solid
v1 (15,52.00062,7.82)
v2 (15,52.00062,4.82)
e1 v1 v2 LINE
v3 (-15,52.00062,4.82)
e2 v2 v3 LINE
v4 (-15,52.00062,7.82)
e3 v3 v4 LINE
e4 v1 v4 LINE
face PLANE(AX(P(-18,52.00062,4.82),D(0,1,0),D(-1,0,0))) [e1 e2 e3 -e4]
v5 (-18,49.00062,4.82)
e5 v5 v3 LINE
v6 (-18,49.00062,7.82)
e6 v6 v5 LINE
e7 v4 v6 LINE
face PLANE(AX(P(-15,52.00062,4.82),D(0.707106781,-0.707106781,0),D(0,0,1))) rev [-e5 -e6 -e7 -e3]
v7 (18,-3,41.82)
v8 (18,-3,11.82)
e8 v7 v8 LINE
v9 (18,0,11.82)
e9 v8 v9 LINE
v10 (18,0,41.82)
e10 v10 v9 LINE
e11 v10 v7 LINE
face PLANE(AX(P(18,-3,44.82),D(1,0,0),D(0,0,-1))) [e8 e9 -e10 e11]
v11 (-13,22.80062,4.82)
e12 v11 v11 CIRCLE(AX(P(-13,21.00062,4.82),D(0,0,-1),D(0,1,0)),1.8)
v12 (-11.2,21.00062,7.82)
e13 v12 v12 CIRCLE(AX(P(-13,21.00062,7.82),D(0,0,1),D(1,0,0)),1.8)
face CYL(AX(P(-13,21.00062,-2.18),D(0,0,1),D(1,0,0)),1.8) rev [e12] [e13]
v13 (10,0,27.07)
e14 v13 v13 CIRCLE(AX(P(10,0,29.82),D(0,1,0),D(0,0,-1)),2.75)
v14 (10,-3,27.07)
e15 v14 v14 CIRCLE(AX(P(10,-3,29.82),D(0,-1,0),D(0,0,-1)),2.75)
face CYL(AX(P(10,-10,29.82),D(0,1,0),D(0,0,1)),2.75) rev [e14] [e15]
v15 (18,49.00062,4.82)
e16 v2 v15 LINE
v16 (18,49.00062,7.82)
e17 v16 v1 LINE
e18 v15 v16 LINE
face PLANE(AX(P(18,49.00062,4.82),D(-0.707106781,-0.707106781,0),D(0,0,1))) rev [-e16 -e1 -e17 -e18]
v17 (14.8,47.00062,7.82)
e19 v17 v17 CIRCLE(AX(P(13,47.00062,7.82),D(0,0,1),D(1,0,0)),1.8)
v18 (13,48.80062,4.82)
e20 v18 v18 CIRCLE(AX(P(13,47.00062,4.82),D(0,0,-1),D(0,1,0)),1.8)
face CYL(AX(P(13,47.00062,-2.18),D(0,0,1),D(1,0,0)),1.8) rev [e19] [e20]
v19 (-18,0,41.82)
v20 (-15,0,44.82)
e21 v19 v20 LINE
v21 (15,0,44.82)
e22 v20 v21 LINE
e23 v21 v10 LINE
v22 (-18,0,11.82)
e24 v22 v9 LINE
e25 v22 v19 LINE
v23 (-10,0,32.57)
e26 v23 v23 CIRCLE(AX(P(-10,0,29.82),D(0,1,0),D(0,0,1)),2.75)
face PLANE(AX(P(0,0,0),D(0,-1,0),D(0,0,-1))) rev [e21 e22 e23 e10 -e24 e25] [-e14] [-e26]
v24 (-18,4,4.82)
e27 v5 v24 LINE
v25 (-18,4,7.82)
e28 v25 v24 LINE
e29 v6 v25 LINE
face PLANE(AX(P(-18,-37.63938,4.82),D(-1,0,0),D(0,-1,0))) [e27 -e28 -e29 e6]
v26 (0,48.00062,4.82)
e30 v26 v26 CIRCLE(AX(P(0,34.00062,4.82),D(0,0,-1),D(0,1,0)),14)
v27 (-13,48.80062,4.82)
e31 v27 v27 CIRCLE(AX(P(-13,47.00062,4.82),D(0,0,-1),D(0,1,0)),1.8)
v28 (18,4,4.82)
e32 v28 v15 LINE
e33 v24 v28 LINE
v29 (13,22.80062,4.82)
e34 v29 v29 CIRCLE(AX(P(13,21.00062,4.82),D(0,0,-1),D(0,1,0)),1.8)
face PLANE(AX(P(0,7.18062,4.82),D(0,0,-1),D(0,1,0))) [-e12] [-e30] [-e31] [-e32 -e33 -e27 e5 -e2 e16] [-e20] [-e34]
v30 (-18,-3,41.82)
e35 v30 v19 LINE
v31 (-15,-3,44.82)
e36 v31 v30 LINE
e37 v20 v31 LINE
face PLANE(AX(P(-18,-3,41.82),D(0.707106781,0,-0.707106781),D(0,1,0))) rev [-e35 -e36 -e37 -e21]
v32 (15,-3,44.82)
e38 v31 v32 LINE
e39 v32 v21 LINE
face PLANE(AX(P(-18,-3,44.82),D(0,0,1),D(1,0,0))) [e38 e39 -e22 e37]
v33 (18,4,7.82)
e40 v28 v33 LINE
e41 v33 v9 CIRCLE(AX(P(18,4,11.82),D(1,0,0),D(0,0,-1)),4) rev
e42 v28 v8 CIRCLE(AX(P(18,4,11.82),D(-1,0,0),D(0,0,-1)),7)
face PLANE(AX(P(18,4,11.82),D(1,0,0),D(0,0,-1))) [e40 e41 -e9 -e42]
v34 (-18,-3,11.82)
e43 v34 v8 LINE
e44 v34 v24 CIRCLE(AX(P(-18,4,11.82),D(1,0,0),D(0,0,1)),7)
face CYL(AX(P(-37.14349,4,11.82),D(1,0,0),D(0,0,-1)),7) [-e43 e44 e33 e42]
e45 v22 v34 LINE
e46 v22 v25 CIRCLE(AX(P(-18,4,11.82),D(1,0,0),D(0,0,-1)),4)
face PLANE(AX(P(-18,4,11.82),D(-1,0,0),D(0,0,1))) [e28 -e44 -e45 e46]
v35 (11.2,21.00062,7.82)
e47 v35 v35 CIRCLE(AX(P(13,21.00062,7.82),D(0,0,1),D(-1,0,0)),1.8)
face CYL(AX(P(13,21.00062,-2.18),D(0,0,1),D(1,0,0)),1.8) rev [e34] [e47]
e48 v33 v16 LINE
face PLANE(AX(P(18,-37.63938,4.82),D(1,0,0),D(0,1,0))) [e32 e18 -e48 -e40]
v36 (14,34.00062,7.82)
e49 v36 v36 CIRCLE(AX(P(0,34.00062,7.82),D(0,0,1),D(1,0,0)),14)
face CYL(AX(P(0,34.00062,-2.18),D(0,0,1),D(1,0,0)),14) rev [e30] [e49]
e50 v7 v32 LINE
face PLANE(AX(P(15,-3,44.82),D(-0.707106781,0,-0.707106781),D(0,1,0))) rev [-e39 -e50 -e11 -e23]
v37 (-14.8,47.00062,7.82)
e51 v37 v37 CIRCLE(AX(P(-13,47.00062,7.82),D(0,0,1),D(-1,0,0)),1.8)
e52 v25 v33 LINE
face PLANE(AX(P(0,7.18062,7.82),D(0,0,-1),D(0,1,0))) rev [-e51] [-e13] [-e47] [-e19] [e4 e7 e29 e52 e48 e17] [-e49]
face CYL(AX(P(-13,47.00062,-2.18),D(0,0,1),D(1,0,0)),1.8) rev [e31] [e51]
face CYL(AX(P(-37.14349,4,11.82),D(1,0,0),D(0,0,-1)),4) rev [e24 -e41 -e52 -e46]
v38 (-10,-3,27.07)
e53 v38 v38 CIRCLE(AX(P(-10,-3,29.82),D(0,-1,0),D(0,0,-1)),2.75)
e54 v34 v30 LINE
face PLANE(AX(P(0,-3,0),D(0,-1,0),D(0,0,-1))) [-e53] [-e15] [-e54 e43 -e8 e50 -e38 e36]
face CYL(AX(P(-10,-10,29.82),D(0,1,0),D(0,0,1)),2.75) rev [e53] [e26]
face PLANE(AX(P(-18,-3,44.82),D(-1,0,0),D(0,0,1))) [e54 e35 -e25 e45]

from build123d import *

# Parameters (mm, degrees)
SKETCH_1_W             = 36
SKETCH_1_H             = 89.64
SM_BASE_FLANGE_1_DEPTH = 3
OTHER_START            = -18
OTHER_1_DEPTH          = 36
OTHER_1_2_DEPTH        = 36
SKETCH_7_R             = 14
SKETCH_7_R_2           = 1.8
CUT_EXTRUDE_1_DEPTH    = 10
CHAMFER_1_SIZE         = 3
SKETCH_8_R             = 2.75
CUT_EXTRUDE_2_DEPTH    = 10


# Read off the part's stored shape, not the designer's step: Нарисованный сгиб1
# Sheet-metal steps are written as plain solids
with BuildPart() as part:
    # Sketch 1 → Базовая кромка1 (new body)
    with BuildSketch(Plane(origin=(0, 0, 0), x_dir=(1, 0, 0), z_dir=(0, 1, 0))):
        Rectangle(SKETCH_1_W, SKETCH_1_H)
    extrude(amount=-SM_BASE_FLANGE_1_DEPTH)

    # Other 1 outline → Other 1 (cut)
    with BuildSketch(Plane.YZ.offset(OTHER_START)):
        with BuildLine():
            Line((0, -44.82), (0, 6.075437354))
            ThreePointArc((0, 6.075437354), (-2.204836823, 8.579629651), (-3, 11.82))
            Line((-3, 11.82), (-3, -44.82))
            Line((-3, -44.82), (0, -44.82))
        make_face()
    extrude(amount=OTHER_1_DEPTH, mode=Mode.SUBTRACT)

    # Other 1 2 outline → Other 1 2 (add)
    with BuildSketch(Plane.YZ.offset(OTHER_START)):
        with BuildLine():
            Line((52.000620203, 7.82), (4, 7.82))
            ThreePointArc((4, 7.82), (1.171572875, 8.991572875), (0, 11.82))
            Line((0, 11.82), (0, 6.075437354))
            ThreePointArc((0, 6.075437354), (1.903805654, 5.141229959), (4, 4.82))
            Line((4, 4.82), (52.000620203, 4.82))
            Line((52.000620203, 4.82), (52.000620203, 7.82))
        make_face()
    extrude(amount=OTHER_1_2_DEPTH)

    # Эскиз7 → Вырез-Вытянуть1 (cut)
    with BuildSketch(Plane.XY.offset(7.82)):
        with Locations((0, 34.000620203)):
            Circle(SKETCH_7_R)
        with Locations((13, 47.000620203)):
            Circle(SKETCH_7_R_2)
        with Locations(Location((-13, 47.000620203, 0), (0, 0, 90))):
            Circle(SKETCH_7_R_2)
        with Locations((-13, 21.000620203)):
            Circle(SKETCH_7_R_2)
        with Locations(Location((13, 21.000620203, 0), (0, 0, 90))):
            Circle(SKETCH_7_R_2)
    extrude(amount=-CUT_EXTRUDE_1_DEPTH, mode=Mode.SUBTRACT)

    # Фаска1
    chamfer_1_edges = [part.edges().sort_by_distance(p)[0] for p in [
        (18, -1.5, 44.82),
        (-18, -1.5, 44.82),
        (-18, 52.000620203, 6.32),
        (18, 52.000620203, 6.32),
    ]]
    chamfer(chamfer_1_edges, length=CHAMFER_1_SIZE)

    # Эскиз8 → Вырез-Вытянуть2 (cut)
    with BuildSketch(Plane(origin=(0, 0, 0), x_dir=(1, 0, 0), z_dir=(0, 1, 0))):
        with Locations(Location((-10, -29.82, 0), (0, 0, 270))):
            Circle(SKETCH_8_R)
        with Locations(Location((10, -29.82, 0), (0, 0, 90))):
            Circle(SKETCH_8_R)
    extrude(amount=-CUT_EXTRUDE_2_DEPTH, mode=Mode.SUBTRACT)


solid = part.part
